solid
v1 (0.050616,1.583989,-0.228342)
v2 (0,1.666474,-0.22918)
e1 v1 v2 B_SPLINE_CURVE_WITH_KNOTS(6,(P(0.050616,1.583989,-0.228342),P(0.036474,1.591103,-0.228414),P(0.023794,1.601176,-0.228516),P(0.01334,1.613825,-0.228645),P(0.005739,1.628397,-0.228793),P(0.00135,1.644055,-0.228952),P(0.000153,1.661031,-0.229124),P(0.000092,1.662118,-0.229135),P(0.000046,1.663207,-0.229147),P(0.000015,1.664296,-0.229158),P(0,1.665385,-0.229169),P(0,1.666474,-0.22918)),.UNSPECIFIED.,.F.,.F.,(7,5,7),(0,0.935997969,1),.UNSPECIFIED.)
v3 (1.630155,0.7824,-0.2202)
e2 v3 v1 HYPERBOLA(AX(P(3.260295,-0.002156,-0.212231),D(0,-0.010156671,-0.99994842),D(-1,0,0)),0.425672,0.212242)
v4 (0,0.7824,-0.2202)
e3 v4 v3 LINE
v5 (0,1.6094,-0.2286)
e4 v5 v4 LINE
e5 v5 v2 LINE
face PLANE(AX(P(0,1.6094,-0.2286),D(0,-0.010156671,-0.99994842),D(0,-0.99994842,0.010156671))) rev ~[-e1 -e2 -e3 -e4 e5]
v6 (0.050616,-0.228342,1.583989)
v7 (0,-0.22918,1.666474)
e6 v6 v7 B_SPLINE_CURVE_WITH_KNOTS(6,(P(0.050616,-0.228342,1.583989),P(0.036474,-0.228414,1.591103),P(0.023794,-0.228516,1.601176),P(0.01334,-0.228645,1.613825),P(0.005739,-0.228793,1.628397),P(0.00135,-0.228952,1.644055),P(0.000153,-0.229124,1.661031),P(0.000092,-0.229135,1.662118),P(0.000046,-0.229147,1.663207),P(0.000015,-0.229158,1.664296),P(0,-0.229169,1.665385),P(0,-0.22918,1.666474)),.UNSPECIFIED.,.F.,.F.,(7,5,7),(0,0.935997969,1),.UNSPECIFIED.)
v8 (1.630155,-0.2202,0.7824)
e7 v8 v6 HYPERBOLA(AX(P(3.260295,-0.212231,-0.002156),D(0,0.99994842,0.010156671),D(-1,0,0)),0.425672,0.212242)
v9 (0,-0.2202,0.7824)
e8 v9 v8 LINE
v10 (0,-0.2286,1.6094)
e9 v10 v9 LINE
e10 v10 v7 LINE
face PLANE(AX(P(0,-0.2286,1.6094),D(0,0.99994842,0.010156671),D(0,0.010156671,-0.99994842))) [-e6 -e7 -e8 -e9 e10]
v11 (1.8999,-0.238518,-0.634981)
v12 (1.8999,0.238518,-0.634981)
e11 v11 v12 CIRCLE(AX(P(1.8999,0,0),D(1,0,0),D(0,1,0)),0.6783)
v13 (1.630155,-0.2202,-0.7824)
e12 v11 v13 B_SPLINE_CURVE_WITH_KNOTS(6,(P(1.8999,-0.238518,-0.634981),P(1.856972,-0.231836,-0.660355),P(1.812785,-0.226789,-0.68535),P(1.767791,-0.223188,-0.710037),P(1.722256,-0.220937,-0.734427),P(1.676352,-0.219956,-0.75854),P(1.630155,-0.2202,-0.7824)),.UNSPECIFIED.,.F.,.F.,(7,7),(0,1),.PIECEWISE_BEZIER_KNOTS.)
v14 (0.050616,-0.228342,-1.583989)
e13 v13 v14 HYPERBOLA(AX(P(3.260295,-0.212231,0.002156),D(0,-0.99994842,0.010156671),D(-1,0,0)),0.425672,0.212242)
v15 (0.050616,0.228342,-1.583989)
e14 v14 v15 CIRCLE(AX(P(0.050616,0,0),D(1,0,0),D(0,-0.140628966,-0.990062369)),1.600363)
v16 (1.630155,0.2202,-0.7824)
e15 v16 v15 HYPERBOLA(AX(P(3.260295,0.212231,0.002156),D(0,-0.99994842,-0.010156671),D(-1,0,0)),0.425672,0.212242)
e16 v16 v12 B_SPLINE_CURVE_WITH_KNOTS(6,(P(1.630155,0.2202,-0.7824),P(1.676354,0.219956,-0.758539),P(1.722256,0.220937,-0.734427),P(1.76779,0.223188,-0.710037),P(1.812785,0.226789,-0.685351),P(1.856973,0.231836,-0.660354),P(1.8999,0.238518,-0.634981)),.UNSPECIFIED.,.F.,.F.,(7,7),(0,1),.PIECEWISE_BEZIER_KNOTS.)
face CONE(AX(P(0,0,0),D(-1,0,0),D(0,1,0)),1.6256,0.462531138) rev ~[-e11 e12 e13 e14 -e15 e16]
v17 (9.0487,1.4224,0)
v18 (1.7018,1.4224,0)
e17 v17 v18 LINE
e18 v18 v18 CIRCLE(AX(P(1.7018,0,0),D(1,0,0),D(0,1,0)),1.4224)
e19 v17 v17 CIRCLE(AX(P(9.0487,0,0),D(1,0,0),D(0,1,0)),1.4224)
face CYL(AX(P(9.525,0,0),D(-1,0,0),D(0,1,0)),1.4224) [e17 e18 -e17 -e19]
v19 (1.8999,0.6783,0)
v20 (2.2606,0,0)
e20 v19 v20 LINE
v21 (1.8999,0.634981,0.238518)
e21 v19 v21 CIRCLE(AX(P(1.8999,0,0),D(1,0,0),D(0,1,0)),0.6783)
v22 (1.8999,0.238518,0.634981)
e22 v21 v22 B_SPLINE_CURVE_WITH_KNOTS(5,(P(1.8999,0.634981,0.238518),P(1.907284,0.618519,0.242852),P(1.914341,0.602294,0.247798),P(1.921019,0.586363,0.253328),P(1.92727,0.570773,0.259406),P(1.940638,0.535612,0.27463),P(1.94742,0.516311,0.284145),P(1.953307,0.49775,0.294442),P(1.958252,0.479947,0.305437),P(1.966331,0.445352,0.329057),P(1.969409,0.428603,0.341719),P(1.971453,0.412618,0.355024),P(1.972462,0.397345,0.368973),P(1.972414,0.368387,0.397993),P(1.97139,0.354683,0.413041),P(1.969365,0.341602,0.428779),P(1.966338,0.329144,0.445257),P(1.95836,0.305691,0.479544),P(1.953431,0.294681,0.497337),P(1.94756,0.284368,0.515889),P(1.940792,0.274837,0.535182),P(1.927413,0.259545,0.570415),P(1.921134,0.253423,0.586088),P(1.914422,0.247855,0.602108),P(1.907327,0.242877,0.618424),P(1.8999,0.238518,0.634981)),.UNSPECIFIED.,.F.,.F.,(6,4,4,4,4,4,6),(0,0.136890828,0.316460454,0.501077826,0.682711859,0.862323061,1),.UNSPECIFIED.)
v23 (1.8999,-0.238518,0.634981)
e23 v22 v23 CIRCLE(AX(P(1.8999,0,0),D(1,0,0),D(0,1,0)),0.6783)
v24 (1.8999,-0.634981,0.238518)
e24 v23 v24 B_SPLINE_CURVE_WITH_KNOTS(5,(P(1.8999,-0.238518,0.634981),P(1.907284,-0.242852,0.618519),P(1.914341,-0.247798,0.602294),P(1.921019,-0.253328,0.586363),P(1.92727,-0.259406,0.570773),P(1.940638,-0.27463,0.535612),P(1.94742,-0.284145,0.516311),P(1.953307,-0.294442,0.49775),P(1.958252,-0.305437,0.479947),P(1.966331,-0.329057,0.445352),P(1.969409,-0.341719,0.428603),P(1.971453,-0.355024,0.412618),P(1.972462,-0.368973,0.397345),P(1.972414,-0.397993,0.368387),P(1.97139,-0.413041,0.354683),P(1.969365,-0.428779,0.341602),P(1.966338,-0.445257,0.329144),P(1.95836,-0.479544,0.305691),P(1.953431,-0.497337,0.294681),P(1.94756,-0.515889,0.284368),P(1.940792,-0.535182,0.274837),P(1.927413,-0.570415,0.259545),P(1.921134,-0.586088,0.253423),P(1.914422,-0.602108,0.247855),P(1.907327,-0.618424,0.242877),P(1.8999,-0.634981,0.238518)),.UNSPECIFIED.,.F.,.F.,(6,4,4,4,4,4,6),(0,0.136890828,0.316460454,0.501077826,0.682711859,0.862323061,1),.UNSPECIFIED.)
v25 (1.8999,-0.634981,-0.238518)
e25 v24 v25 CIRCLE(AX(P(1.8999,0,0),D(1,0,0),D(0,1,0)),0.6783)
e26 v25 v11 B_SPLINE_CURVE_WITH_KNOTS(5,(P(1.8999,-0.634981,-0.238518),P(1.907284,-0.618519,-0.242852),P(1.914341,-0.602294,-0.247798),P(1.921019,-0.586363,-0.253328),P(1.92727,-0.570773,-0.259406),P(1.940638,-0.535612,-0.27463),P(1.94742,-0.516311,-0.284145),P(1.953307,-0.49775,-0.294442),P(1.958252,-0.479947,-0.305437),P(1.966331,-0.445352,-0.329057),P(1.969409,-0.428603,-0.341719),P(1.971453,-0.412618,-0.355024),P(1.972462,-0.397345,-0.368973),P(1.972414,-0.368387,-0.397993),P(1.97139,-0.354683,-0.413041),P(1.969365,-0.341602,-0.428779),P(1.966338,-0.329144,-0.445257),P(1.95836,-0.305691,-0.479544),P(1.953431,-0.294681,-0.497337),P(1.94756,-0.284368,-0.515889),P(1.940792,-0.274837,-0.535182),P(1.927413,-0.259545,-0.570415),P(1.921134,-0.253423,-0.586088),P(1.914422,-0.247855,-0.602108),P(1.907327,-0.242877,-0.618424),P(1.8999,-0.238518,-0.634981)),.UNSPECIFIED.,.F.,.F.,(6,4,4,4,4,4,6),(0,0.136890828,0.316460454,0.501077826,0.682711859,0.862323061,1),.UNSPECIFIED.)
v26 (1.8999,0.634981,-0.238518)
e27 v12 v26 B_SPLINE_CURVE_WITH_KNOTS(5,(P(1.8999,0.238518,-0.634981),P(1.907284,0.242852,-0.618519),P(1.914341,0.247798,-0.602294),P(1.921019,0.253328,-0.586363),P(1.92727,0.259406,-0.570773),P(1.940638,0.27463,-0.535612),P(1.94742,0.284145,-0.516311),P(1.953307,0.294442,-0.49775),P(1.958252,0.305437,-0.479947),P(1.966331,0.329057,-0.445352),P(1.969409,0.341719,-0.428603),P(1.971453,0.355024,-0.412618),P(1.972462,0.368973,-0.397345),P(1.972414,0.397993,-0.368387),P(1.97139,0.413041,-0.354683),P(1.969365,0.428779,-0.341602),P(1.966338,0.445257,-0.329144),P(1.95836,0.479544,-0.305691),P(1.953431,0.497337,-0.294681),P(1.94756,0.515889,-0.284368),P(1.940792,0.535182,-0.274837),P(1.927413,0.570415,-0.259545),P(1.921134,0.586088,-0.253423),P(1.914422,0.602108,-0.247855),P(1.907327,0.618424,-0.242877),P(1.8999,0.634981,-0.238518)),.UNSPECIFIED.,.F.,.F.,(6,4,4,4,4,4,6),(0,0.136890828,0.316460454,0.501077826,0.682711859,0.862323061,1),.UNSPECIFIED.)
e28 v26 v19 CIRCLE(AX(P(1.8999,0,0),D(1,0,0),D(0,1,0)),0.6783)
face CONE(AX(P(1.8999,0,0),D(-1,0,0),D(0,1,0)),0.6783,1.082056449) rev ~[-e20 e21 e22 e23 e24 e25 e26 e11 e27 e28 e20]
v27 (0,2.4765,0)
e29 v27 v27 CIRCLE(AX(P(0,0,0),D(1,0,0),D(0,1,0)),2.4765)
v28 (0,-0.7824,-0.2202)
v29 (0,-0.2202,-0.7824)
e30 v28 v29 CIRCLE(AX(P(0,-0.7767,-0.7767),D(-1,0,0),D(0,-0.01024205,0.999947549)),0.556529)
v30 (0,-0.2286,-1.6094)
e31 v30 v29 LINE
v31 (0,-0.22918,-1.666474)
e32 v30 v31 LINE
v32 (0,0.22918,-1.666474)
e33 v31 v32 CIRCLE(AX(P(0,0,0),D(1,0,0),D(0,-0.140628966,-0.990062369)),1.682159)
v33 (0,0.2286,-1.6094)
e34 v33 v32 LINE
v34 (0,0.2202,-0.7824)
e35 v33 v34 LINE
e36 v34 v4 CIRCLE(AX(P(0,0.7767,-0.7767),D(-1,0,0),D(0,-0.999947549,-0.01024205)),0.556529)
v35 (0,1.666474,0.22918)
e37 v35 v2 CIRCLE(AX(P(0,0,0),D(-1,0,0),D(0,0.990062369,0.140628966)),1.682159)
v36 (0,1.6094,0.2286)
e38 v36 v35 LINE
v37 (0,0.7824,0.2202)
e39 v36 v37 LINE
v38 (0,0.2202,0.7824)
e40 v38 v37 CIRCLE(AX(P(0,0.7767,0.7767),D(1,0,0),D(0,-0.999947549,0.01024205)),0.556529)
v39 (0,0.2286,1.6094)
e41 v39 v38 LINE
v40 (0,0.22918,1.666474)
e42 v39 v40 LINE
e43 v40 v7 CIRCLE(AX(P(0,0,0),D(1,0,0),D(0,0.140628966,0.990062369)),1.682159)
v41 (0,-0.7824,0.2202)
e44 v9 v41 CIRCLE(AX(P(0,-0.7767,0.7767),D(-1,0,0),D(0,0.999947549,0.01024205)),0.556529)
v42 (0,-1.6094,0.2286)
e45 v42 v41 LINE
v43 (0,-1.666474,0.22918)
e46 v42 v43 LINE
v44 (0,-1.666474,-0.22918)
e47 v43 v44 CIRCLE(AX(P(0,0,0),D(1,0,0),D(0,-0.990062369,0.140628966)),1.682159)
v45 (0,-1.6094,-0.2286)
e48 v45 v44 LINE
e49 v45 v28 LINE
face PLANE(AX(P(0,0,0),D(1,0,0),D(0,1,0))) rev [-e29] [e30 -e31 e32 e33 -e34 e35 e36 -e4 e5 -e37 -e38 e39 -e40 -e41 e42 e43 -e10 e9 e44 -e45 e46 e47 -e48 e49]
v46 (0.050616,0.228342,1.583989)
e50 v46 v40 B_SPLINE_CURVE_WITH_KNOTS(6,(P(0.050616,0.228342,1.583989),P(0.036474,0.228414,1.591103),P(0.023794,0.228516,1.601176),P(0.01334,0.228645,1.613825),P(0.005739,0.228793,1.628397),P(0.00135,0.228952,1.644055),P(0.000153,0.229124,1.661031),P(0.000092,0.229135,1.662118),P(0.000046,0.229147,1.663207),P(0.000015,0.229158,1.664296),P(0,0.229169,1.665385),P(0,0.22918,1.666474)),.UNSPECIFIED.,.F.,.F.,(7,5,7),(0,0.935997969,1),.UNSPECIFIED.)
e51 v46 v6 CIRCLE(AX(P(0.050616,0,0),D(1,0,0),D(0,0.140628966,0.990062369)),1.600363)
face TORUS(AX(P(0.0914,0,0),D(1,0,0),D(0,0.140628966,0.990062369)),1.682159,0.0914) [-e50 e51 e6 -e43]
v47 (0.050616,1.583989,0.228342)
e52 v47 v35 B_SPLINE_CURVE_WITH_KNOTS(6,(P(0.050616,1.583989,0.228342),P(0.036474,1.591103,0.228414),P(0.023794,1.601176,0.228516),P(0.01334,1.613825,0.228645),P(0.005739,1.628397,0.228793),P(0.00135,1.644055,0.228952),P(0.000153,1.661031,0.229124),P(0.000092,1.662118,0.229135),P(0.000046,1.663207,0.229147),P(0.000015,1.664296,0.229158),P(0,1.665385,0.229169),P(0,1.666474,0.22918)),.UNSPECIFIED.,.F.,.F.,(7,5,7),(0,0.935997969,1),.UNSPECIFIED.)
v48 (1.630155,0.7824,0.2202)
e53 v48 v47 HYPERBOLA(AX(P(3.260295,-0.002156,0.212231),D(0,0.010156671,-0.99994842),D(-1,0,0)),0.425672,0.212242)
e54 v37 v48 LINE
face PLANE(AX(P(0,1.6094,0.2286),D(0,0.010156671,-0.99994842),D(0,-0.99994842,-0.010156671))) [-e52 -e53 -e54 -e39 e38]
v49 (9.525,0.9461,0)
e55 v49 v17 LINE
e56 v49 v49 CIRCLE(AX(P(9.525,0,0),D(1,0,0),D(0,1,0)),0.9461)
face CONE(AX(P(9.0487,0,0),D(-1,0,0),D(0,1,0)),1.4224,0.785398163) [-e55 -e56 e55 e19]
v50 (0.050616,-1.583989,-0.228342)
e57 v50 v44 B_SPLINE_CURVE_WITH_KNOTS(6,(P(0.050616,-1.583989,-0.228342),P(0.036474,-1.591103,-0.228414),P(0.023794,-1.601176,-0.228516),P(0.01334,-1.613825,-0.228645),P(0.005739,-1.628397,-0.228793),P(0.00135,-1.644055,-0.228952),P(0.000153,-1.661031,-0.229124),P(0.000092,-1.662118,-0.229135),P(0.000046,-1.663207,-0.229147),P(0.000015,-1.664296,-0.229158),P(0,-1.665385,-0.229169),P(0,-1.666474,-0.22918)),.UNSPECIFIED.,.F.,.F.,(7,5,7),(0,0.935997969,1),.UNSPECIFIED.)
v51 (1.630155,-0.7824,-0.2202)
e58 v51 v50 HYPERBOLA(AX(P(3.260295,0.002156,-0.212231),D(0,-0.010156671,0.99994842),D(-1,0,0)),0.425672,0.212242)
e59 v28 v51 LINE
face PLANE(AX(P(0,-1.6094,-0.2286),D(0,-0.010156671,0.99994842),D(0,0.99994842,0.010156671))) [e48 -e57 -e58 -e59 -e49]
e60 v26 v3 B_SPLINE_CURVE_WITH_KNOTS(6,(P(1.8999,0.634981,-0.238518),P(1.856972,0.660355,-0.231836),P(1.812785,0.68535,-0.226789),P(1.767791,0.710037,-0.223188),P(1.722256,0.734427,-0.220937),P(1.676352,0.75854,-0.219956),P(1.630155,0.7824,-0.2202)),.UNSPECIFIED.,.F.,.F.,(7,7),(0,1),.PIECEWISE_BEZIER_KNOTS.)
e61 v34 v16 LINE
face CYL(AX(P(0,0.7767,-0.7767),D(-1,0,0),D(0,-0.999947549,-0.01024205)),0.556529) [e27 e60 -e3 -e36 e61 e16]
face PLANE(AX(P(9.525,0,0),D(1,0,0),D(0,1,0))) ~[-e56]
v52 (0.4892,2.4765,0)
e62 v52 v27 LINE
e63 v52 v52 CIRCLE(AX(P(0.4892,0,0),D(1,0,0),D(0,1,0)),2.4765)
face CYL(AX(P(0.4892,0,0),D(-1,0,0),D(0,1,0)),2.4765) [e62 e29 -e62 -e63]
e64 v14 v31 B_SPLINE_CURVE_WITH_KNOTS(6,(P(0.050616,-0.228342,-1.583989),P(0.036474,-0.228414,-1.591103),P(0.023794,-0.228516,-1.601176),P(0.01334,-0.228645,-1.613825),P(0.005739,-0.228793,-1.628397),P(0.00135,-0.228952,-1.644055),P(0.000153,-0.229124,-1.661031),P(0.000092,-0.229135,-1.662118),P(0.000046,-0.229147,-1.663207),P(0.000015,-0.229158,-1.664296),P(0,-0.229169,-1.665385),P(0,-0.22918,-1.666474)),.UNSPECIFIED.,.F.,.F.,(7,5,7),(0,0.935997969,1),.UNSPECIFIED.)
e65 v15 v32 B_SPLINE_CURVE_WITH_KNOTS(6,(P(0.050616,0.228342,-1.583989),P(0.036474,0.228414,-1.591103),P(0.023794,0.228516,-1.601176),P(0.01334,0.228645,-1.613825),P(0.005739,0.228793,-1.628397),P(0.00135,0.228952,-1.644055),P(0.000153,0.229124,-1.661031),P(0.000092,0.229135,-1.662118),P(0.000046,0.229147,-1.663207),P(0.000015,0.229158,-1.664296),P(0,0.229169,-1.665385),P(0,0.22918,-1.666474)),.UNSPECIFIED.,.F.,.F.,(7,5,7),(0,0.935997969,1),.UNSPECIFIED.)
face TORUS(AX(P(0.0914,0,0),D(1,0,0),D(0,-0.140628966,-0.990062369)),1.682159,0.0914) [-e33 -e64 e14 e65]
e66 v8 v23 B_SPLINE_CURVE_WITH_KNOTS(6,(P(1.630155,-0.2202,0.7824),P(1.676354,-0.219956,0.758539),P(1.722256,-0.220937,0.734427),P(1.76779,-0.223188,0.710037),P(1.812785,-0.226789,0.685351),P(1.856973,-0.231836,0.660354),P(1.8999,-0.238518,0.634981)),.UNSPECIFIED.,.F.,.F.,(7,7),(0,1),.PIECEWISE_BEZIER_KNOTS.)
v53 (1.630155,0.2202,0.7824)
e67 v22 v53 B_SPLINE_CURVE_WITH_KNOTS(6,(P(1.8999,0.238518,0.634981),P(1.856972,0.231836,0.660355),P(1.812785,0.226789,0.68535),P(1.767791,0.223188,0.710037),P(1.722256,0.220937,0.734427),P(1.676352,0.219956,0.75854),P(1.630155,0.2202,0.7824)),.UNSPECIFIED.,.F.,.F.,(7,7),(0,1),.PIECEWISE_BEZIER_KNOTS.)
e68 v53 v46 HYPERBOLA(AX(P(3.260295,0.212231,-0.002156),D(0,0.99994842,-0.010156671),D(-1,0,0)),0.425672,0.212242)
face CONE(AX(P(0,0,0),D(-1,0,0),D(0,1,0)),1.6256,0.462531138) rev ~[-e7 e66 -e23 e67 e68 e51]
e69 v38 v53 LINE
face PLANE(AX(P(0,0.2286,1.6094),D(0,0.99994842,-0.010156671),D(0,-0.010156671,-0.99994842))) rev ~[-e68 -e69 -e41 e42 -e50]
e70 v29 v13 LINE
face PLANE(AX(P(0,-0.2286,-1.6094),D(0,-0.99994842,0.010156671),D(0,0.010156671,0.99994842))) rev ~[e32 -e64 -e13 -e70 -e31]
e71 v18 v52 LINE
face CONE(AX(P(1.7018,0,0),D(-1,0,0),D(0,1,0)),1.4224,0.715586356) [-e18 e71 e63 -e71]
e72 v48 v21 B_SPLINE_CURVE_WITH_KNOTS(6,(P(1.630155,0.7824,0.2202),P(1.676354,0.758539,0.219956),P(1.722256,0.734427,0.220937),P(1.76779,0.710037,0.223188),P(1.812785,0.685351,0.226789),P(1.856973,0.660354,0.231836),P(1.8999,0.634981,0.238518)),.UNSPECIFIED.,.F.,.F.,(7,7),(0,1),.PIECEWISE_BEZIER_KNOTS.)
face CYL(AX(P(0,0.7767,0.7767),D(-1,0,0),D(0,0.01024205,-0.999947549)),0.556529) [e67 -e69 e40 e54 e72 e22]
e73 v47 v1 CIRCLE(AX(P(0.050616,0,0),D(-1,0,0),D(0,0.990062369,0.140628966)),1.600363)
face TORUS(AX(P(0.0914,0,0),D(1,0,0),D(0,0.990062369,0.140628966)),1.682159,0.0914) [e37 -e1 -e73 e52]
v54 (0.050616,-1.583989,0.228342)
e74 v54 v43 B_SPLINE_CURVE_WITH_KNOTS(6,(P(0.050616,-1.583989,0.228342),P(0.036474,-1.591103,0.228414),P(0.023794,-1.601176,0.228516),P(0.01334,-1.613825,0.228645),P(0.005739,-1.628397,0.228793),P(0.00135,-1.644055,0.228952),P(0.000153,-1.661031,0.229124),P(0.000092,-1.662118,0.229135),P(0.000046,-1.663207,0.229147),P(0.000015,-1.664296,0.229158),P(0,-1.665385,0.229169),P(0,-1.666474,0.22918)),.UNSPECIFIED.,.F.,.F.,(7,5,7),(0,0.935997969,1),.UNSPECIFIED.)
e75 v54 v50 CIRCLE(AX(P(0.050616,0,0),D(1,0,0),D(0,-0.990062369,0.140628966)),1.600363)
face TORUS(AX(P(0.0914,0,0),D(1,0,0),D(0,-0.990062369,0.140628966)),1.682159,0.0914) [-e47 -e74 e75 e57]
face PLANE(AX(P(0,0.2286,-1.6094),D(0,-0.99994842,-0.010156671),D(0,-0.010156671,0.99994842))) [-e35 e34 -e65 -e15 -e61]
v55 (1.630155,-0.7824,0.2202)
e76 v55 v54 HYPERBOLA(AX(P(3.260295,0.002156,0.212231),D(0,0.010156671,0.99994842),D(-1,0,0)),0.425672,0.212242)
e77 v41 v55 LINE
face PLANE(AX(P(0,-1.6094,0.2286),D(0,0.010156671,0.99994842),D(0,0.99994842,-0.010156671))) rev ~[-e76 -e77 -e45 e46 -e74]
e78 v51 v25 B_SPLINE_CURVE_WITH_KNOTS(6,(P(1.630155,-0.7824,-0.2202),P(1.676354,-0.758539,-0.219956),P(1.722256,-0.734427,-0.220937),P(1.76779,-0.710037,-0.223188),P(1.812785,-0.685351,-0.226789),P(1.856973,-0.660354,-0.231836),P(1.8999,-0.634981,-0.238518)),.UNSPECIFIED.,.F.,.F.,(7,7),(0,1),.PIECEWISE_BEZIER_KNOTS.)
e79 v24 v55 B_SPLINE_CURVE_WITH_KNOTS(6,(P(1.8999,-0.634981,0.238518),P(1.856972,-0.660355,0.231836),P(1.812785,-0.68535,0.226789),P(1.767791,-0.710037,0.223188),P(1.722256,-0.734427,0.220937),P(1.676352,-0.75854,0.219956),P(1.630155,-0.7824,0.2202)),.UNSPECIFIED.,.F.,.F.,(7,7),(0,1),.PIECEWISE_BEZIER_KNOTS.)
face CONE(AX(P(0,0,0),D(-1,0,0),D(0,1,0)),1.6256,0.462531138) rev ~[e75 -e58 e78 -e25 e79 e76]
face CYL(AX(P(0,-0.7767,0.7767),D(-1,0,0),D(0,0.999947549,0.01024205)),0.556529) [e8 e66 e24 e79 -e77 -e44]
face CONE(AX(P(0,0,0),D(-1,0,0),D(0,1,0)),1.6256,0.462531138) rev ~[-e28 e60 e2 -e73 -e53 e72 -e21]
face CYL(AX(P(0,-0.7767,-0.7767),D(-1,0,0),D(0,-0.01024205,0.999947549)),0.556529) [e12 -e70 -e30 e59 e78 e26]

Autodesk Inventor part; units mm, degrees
ref_plane "YZ Plane" through (0, 0, 0) normal (1, 0, 0) x (0, 1, 0)
ref_plane "XZ Plane" through (0, 0, 0) normal (0, 1, 0) x (-1, 0, 0)
sketch "Sketch1" plane through (0, 0, 0) normal (0, 0, 1) x (1, 0, 0)
  line L0 (2.2606, 0) -> (9.525, 0)
  line L1 (9.525, 0) -> (9.525, 1.4224)
  line L2 (9.525, 1.4224) -> (1.7018, 1.4224)
  line L3 (0.4892, 2.4765) -> (0, 2.4765)
  line L4 (-1.905, 0) -> (11.43, 0) projected
  line L5 (0, -0.4953) -> (0, 2.9718) projected
  line L6 (0, 1.6256) -> (1.8999, 0.6783)
  line L7 (1.8999, 0.6783) -> (2.2606, 0)
  line L8 (1.7018, 1.4224) -> (0.4892, 2.4765)
  line L9 (0, 2.4765) -> (0, 1.6256)
  dimension "d2" = 2.8448
  dimension "d3" = 4.953
  dimension "d4" = 2.2606
  dimension "d5" = 3.2512
  dimension "d6" = 26.5
  dimension "d7" = 62
  dimension "d13" = 41
  dimension "d14" = 1.7018
  dimension "d15" = 9.525
revolve "Body" add sketch "Sketch1" angle 360 about axis through (2.2606, 0, 0) along (1, 0, 0) contours L7 L6 L5 L3 L8 L2 L1 L0
sketch "Sketch2" plane through (0, 0, 0) normal (-1, 0, 0) x (0, 0, 1)
  line L0 (0, -3.4671) -> (0, 3.4671) projected
  line L1 (-3.4671, 0) -> (3.4671, 0) projected
  line L2 (0, 1.6256) -> (0, 0) construction
  line L3 (0, 0) -> (1.6256, 0) construction
  arc A0 (0.5419, 0) -> (0, 0.5419) centre (0, 0) ccw
  line L4 (0, 0) -> (0.7947, 0.7947) construction
  arc A1 (0.8128, 0) -> (0, 0.8128) centre (0, 0) ccw construction
  line L5 (0.2286, 1.6094) -> (0.2202, 0.7824)
  line L6 (1.6094, 0.2286) -> (0.7824, 0.2202)
  arc A2 (0.2202, 0.7824) -> (0.7824, 0.2202) centre (0.7767, 0.7767) ccw
  arc A3 (1.6256, 0) -> (1.6094, 0.2286) centre (0, 0) ccw
  arc A4 (0.2286, 1.6094) -> (0, 1.6256) centre (0, 0) ccw
  arc A5 (1.6094, 0.2286) -> (0.2286, 1.6094) centre (0, 0) ccw
  line L7 (0.2286, -1.6094) -> (0.2202, -0.7824)
  line L8 (1.6094, -0.2286) -> (0.7824, -0.2202)
  arc A6 (0.7824, -0.2202) -> (0.2202, -0.7824) centre (0.7767, -0.7767) ccw
  arc A7 (1.6094, -0.2286) -> (1.6256, 0) centre (0, 0) ccw
  arc A8 (0, -1.6256) -> (0.2286, -1.6094) centre (0, 0) ccw
  arc A9 (0.2286, -1.6094) -> (1.6094, -0.2286) centre (0, 0) ccw
  line L9 (-0.2286, 1.6094) -> (-0.2202, 0.7824)
  line L10 (-1.6094, 0.2286) -> (-0.7824, 0.2202)
  arc A10 (-0.7824, 0.2202) -> (-0.2202, 0.7824) centre (-0.7767, 0.7767) ccw
  arc A11 (-1.6094, 0.2286) -> (-1.6256, 0) centre (0, 0) ccw
  arc A12 (0, 1.6256) -> (-0.2286, 1.6094) centre (0, 0) ccw
  arc A13 (-0.2286, 1.6094) -> (-1.6094, 0.2286) centre (0, 0) ccw
  arc A14 (-1.6094, -0.2286) -> (-0.2286, -1.6094) centre (0, 0) ccw
  arc A15 (-0.2286, -1.6094) -> (0, -1.6256) centre (0, 0) ccw
  arc A16 (-1.6256, 0) -> (-1.6094, -0.2286) centre (0, 0) ccw
  line L11 (-1.6094, -0.2286) -> (-0.7824, -0.2202)
  arc A17 (-0.2202, -0.7824) -> (-0.7824, -0.2202) centre (-0.7767, -0.7767) ccw
  line L12 (-0.2286, -1.6094) -> (-0.2202, -0.7824)
  dimension "d18" = 45
  dimension "d19" = 1.0837
  dimension "d20" = 1.6256
  dimension "d21" = 3.2512
  dimension "d22" = 0.2286
extrude "Slot" add sketch "Sketch2" against normal up to next contours A2 L5 A5 L6 | L9 A10 L10 A13 | L7 A6 L8 A9 | A14 L11 A17 L12
fillet "Fillet1" radius 0.0914 4 edges at (0, 1.6256, 0) (0, 0, 1.6256) (0, -1.6256, 0) (0, 0, -1.6256)
thread "Thread" size "4-40 UNC" class "2A" standard "ANSI Unified Screw Threads" length 6.2357
chamfer "Chamfer1" distance 0.4763 distance2 0.4763 1 edges at (9.525, -1.4224, 0) measured on face at (9.525, 0.2736, 0.8712)
ref_plane "Work Plane2" through (2.032, 0, 0) normal (0, 1, 0) x (1, 0, 0)
equation "\"d2\" = GD"
equation "\"d3\" = KOD"
equation "\"d4\" = INTI"
equation "\"d5\" = SDM"
equation "\"d13\" = 0.5 * SEWI"
equation "\"d14\" = KOH"
equation "\"d15\" = NLG"
equation "\"d19\" = 0.333333 * SDM"
equation "\"d20\" = 0.5 * SDM"
equation "\"d21\" = SDM"
equation "\"d22\" = 0.5 * SBR"
equation "\"d45\" = INTI"
equation "\"d25\" = 0.2 * SBR"
equation "\"d9\" = GEL"
equation "\"d11\" = -0.5 * SPD + 0.5 * GD"
equation "\"d12\" = GUL"
equation "\"GD\" = NND"
equation "\"NLG\" = 9.525"
equation "\"GEL\" = 6.2357"
equation "\"KOD\" = 4.953"
equation "\"KOH\" = 1.7018"
equation "\"SDM\" = 3.2512"
equation "\"INTI\" = 2.2606"
equation "\"SBR\" = 0.4572"
equation "\"GUL\" = 0.75 * GAL"
equation "\"SPD\" = 1.8923"
equation "\"SEWI\" = 82deg"
equation "\"d0\" = NLG"
equation "\"d1\" = KOH"
equation "\"d17\" = SDM"
equation "\"TOA\" = 30deg"
equation "\"THREADDIA\" = 2.8448"
equation "\"BDM\" = NND"
equation "\"NND\" = 2.8448"
equation "\"GAL\" = 0.635"
equation "\"GD1\" = SPD"
properties part number "ANSI B18.6.3 - 4-40 x 3/8, CRFCHMSTII(5)" material "Steel, Mild"
